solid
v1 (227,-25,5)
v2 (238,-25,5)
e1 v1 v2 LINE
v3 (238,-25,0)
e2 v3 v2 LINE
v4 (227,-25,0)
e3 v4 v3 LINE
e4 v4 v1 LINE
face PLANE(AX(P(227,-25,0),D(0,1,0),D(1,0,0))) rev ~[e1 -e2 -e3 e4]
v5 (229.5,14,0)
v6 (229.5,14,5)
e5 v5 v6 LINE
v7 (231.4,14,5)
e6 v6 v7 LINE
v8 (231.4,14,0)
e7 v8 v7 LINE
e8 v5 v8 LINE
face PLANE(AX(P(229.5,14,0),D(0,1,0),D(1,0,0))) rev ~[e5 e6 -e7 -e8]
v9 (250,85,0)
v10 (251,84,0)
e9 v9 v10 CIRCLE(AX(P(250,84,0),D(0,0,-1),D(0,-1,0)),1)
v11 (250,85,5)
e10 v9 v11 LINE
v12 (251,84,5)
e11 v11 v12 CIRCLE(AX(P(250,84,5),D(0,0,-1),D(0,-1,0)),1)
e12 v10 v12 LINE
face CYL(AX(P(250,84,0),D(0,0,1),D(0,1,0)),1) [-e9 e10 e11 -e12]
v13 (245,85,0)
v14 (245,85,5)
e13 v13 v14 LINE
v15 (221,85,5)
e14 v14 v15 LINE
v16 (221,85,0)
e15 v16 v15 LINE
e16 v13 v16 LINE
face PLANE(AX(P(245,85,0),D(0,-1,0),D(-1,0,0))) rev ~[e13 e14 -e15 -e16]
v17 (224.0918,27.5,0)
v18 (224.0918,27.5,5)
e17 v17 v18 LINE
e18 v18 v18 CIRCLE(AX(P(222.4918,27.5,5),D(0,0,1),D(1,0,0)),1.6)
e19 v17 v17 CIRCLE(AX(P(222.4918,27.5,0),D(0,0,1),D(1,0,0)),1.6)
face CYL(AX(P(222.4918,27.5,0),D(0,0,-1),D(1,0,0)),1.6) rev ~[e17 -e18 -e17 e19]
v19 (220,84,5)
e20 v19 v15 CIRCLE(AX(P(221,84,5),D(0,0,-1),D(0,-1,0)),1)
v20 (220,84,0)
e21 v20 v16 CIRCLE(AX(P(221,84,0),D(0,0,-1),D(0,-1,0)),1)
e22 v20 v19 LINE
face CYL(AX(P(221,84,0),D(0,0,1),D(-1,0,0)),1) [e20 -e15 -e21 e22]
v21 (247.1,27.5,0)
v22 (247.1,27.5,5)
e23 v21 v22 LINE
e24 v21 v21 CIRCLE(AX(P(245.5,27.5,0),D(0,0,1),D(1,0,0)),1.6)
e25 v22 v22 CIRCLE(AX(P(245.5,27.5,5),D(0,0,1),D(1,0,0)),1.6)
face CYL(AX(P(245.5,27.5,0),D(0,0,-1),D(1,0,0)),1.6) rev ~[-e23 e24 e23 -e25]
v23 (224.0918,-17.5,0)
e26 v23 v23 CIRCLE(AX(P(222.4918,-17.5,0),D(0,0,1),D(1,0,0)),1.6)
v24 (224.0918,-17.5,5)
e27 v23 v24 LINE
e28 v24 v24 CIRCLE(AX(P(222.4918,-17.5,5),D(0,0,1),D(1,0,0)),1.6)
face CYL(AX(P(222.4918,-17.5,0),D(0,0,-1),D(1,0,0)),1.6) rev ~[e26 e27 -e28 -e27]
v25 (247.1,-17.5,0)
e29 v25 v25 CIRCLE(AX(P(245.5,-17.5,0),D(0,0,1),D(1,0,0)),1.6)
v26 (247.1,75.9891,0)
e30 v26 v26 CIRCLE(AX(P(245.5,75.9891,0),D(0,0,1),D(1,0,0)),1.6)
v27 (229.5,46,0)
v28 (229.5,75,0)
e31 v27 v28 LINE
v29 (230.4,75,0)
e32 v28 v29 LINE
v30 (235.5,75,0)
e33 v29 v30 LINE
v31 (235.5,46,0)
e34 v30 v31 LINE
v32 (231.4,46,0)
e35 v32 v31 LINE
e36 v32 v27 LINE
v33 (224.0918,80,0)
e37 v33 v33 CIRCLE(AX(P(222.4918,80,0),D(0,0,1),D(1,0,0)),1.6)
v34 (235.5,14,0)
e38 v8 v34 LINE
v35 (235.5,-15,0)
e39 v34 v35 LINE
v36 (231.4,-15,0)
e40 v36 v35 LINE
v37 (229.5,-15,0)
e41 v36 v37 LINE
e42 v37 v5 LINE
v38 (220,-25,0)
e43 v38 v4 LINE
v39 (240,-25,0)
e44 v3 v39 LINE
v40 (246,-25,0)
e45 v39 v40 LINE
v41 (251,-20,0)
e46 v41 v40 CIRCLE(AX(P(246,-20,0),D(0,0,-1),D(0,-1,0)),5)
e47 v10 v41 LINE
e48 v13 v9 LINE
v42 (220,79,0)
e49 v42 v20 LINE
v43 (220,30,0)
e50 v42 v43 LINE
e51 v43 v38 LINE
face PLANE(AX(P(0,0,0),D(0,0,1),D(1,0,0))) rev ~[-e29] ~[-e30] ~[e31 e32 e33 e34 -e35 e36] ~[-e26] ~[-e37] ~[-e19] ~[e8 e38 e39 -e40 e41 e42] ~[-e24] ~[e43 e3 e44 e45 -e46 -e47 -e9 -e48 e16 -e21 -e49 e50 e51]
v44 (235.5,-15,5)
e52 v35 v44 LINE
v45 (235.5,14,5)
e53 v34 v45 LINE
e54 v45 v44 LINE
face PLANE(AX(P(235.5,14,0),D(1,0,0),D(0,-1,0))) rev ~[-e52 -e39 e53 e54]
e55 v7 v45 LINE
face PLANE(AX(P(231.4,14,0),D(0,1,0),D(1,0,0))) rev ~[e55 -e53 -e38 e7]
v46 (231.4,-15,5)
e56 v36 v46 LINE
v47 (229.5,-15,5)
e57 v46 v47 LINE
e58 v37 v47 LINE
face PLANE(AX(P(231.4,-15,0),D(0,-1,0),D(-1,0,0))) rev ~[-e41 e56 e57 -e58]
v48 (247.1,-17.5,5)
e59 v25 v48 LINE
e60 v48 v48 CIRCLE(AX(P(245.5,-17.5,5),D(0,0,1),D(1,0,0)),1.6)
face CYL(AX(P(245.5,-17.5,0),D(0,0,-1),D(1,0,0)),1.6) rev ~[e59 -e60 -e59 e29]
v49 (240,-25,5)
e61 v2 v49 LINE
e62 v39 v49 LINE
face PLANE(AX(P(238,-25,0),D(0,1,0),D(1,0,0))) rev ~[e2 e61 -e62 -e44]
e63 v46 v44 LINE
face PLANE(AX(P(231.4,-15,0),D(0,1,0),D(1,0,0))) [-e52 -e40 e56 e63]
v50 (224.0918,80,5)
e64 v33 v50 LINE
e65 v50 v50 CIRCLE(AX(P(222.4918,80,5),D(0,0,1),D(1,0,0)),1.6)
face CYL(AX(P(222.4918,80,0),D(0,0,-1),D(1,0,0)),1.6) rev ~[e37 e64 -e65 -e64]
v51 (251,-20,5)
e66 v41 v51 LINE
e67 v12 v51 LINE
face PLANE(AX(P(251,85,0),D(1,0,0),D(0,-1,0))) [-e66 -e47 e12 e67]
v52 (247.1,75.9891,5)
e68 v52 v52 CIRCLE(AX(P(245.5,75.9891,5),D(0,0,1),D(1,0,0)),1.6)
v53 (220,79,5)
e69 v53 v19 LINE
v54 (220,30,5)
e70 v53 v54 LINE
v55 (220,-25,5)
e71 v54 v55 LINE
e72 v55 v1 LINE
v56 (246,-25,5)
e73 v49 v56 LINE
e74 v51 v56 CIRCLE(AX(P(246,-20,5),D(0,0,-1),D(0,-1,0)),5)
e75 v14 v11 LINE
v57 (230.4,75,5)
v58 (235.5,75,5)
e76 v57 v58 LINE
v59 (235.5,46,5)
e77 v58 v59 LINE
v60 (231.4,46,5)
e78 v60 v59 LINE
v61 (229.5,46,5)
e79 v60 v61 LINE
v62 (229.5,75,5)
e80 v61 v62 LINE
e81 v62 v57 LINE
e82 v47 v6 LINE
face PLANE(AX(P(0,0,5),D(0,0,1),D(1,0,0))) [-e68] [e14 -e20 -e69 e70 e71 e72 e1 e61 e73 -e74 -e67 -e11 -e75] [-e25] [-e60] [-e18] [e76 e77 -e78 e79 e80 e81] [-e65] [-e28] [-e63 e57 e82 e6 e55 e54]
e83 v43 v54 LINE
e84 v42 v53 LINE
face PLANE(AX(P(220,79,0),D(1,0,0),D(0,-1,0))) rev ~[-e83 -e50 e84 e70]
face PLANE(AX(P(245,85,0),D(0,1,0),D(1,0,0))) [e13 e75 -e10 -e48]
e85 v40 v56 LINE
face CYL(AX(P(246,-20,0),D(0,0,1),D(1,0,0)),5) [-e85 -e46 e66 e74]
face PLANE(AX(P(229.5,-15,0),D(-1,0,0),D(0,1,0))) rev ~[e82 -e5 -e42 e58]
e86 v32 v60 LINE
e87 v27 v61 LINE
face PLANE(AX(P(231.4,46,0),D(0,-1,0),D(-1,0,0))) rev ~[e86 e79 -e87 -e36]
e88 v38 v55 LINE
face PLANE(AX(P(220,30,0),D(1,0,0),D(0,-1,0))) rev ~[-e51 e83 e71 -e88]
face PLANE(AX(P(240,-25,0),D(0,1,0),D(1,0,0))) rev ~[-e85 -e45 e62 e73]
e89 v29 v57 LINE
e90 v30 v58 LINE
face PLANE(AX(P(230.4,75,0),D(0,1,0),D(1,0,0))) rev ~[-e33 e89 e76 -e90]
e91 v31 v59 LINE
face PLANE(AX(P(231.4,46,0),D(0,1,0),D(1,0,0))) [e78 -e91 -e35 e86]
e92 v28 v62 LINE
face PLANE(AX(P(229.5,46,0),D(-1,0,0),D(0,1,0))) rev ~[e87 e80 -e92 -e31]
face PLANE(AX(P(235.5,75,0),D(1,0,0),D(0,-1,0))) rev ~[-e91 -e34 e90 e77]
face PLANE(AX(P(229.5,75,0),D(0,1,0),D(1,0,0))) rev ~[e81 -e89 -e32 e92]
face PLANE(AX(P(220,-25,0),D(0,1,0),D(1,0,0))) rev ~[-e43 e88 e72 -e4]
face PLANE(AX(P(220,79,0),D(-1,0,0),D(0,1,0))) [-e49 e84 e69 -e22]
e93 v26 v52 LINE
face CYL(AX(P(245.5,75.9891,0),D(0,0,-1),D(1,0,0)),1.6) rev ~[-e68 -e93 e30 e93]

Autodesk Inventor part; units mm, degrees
ref_plane "YZ Plane" through (0, 0, 0) normal (1, 0, 0) x (0, 1, 0)
ref_plane "XZ Plane" through (0, 0, 0) normal (0, 1, 0) x (-1, 0, 0)
ref_plane "XY Plane" through (0, 0, 0) normal (0, 0, 1) x (1, 0, 0)
sketch "Boceto1" plane through (0, 0, 0) normal (0, 0, 1) x (1, 0, 0)
  line L0 (220, 79) -> (220, 30)
  line L1 (229.5, 46) -> (229.5, 75)
  line L2 (235.5, 75) -> (235.5, 46)
  line L3 (229.5, -15) -> (229.5, 14)
  line L4 (235.5, 14) -> (235.5, -15)
  circle A0 centre (222.4918, -17.5) radius 1.6
  circle A1 centre (222.4918, 27.5) radius 1.6
  circle A2 centre (245.5, 27.5) radius 1.6
  circle A3 centre (245.5, -17.5) radius 1.6
  circle A4 centre (222.4918, 80) radius 1.6
  circle A5 centre (245.5, 75.9891) radius 1.6
  line L5 (220, 30) -> (220, -25)
  line L6 (229.5, 75) -> (230.4, 75)
  line L7 (231.4, 46) -> (229.5, 46)
  line L8 (220, -25) -> (227, -25)
  line L9 (238, -25) -> (240, -25)
  line L10 (231.4, -15) -> (229.5, -15)
  line L11 (229.5, 14) -> (231.4, 14)
  line L12 (230.4, 75) -> (235.5, 75)
  line L13 (231.4, 46) -> (235.5, 46)
  line L14 (231.4, 14) -> (235.5, 14)
  line L15 (231.4, -15) -> (235.5, -15)
  line L16 (227, -25) -> (238, -25)
  line L17 (245, 85) -> (220, 85)
  line L18 (220, 79) -> (220, 85)
  line L19 (251, 85) -> (251, -25)
  line L20 (240, -25) -> (251, -25)
  line L21 (245, 85) -> (251, 85)
  point P0 (0, 0)
  point P1 (245, -15)
  point P2 (245, 75)
  dimension "d2" = 6
  dimension "d3" = 9.5
  dimension "d4" = 6
  dimension "d5" = 9.5
  dimension "d6" = 29
  dimension "d9" = 9.0109
  dimension "d10" = 5
  dimension "d11" = 10
  dimension "d14" = 25.5
  dimension "d15" = 25.5
  dimension "d16" = 25.5
extrude "Extrusión1" add sketch "Boceto1" along normal blind 5
fillet "Empalme1" radius 1 2 edges at (251, 85, 2.5) (220, 85, 2.5)
fillet "Empalme2" radius 5 1 edges at (251, -25, 2.5)
properties part number "suplemento cojinete tapa"
